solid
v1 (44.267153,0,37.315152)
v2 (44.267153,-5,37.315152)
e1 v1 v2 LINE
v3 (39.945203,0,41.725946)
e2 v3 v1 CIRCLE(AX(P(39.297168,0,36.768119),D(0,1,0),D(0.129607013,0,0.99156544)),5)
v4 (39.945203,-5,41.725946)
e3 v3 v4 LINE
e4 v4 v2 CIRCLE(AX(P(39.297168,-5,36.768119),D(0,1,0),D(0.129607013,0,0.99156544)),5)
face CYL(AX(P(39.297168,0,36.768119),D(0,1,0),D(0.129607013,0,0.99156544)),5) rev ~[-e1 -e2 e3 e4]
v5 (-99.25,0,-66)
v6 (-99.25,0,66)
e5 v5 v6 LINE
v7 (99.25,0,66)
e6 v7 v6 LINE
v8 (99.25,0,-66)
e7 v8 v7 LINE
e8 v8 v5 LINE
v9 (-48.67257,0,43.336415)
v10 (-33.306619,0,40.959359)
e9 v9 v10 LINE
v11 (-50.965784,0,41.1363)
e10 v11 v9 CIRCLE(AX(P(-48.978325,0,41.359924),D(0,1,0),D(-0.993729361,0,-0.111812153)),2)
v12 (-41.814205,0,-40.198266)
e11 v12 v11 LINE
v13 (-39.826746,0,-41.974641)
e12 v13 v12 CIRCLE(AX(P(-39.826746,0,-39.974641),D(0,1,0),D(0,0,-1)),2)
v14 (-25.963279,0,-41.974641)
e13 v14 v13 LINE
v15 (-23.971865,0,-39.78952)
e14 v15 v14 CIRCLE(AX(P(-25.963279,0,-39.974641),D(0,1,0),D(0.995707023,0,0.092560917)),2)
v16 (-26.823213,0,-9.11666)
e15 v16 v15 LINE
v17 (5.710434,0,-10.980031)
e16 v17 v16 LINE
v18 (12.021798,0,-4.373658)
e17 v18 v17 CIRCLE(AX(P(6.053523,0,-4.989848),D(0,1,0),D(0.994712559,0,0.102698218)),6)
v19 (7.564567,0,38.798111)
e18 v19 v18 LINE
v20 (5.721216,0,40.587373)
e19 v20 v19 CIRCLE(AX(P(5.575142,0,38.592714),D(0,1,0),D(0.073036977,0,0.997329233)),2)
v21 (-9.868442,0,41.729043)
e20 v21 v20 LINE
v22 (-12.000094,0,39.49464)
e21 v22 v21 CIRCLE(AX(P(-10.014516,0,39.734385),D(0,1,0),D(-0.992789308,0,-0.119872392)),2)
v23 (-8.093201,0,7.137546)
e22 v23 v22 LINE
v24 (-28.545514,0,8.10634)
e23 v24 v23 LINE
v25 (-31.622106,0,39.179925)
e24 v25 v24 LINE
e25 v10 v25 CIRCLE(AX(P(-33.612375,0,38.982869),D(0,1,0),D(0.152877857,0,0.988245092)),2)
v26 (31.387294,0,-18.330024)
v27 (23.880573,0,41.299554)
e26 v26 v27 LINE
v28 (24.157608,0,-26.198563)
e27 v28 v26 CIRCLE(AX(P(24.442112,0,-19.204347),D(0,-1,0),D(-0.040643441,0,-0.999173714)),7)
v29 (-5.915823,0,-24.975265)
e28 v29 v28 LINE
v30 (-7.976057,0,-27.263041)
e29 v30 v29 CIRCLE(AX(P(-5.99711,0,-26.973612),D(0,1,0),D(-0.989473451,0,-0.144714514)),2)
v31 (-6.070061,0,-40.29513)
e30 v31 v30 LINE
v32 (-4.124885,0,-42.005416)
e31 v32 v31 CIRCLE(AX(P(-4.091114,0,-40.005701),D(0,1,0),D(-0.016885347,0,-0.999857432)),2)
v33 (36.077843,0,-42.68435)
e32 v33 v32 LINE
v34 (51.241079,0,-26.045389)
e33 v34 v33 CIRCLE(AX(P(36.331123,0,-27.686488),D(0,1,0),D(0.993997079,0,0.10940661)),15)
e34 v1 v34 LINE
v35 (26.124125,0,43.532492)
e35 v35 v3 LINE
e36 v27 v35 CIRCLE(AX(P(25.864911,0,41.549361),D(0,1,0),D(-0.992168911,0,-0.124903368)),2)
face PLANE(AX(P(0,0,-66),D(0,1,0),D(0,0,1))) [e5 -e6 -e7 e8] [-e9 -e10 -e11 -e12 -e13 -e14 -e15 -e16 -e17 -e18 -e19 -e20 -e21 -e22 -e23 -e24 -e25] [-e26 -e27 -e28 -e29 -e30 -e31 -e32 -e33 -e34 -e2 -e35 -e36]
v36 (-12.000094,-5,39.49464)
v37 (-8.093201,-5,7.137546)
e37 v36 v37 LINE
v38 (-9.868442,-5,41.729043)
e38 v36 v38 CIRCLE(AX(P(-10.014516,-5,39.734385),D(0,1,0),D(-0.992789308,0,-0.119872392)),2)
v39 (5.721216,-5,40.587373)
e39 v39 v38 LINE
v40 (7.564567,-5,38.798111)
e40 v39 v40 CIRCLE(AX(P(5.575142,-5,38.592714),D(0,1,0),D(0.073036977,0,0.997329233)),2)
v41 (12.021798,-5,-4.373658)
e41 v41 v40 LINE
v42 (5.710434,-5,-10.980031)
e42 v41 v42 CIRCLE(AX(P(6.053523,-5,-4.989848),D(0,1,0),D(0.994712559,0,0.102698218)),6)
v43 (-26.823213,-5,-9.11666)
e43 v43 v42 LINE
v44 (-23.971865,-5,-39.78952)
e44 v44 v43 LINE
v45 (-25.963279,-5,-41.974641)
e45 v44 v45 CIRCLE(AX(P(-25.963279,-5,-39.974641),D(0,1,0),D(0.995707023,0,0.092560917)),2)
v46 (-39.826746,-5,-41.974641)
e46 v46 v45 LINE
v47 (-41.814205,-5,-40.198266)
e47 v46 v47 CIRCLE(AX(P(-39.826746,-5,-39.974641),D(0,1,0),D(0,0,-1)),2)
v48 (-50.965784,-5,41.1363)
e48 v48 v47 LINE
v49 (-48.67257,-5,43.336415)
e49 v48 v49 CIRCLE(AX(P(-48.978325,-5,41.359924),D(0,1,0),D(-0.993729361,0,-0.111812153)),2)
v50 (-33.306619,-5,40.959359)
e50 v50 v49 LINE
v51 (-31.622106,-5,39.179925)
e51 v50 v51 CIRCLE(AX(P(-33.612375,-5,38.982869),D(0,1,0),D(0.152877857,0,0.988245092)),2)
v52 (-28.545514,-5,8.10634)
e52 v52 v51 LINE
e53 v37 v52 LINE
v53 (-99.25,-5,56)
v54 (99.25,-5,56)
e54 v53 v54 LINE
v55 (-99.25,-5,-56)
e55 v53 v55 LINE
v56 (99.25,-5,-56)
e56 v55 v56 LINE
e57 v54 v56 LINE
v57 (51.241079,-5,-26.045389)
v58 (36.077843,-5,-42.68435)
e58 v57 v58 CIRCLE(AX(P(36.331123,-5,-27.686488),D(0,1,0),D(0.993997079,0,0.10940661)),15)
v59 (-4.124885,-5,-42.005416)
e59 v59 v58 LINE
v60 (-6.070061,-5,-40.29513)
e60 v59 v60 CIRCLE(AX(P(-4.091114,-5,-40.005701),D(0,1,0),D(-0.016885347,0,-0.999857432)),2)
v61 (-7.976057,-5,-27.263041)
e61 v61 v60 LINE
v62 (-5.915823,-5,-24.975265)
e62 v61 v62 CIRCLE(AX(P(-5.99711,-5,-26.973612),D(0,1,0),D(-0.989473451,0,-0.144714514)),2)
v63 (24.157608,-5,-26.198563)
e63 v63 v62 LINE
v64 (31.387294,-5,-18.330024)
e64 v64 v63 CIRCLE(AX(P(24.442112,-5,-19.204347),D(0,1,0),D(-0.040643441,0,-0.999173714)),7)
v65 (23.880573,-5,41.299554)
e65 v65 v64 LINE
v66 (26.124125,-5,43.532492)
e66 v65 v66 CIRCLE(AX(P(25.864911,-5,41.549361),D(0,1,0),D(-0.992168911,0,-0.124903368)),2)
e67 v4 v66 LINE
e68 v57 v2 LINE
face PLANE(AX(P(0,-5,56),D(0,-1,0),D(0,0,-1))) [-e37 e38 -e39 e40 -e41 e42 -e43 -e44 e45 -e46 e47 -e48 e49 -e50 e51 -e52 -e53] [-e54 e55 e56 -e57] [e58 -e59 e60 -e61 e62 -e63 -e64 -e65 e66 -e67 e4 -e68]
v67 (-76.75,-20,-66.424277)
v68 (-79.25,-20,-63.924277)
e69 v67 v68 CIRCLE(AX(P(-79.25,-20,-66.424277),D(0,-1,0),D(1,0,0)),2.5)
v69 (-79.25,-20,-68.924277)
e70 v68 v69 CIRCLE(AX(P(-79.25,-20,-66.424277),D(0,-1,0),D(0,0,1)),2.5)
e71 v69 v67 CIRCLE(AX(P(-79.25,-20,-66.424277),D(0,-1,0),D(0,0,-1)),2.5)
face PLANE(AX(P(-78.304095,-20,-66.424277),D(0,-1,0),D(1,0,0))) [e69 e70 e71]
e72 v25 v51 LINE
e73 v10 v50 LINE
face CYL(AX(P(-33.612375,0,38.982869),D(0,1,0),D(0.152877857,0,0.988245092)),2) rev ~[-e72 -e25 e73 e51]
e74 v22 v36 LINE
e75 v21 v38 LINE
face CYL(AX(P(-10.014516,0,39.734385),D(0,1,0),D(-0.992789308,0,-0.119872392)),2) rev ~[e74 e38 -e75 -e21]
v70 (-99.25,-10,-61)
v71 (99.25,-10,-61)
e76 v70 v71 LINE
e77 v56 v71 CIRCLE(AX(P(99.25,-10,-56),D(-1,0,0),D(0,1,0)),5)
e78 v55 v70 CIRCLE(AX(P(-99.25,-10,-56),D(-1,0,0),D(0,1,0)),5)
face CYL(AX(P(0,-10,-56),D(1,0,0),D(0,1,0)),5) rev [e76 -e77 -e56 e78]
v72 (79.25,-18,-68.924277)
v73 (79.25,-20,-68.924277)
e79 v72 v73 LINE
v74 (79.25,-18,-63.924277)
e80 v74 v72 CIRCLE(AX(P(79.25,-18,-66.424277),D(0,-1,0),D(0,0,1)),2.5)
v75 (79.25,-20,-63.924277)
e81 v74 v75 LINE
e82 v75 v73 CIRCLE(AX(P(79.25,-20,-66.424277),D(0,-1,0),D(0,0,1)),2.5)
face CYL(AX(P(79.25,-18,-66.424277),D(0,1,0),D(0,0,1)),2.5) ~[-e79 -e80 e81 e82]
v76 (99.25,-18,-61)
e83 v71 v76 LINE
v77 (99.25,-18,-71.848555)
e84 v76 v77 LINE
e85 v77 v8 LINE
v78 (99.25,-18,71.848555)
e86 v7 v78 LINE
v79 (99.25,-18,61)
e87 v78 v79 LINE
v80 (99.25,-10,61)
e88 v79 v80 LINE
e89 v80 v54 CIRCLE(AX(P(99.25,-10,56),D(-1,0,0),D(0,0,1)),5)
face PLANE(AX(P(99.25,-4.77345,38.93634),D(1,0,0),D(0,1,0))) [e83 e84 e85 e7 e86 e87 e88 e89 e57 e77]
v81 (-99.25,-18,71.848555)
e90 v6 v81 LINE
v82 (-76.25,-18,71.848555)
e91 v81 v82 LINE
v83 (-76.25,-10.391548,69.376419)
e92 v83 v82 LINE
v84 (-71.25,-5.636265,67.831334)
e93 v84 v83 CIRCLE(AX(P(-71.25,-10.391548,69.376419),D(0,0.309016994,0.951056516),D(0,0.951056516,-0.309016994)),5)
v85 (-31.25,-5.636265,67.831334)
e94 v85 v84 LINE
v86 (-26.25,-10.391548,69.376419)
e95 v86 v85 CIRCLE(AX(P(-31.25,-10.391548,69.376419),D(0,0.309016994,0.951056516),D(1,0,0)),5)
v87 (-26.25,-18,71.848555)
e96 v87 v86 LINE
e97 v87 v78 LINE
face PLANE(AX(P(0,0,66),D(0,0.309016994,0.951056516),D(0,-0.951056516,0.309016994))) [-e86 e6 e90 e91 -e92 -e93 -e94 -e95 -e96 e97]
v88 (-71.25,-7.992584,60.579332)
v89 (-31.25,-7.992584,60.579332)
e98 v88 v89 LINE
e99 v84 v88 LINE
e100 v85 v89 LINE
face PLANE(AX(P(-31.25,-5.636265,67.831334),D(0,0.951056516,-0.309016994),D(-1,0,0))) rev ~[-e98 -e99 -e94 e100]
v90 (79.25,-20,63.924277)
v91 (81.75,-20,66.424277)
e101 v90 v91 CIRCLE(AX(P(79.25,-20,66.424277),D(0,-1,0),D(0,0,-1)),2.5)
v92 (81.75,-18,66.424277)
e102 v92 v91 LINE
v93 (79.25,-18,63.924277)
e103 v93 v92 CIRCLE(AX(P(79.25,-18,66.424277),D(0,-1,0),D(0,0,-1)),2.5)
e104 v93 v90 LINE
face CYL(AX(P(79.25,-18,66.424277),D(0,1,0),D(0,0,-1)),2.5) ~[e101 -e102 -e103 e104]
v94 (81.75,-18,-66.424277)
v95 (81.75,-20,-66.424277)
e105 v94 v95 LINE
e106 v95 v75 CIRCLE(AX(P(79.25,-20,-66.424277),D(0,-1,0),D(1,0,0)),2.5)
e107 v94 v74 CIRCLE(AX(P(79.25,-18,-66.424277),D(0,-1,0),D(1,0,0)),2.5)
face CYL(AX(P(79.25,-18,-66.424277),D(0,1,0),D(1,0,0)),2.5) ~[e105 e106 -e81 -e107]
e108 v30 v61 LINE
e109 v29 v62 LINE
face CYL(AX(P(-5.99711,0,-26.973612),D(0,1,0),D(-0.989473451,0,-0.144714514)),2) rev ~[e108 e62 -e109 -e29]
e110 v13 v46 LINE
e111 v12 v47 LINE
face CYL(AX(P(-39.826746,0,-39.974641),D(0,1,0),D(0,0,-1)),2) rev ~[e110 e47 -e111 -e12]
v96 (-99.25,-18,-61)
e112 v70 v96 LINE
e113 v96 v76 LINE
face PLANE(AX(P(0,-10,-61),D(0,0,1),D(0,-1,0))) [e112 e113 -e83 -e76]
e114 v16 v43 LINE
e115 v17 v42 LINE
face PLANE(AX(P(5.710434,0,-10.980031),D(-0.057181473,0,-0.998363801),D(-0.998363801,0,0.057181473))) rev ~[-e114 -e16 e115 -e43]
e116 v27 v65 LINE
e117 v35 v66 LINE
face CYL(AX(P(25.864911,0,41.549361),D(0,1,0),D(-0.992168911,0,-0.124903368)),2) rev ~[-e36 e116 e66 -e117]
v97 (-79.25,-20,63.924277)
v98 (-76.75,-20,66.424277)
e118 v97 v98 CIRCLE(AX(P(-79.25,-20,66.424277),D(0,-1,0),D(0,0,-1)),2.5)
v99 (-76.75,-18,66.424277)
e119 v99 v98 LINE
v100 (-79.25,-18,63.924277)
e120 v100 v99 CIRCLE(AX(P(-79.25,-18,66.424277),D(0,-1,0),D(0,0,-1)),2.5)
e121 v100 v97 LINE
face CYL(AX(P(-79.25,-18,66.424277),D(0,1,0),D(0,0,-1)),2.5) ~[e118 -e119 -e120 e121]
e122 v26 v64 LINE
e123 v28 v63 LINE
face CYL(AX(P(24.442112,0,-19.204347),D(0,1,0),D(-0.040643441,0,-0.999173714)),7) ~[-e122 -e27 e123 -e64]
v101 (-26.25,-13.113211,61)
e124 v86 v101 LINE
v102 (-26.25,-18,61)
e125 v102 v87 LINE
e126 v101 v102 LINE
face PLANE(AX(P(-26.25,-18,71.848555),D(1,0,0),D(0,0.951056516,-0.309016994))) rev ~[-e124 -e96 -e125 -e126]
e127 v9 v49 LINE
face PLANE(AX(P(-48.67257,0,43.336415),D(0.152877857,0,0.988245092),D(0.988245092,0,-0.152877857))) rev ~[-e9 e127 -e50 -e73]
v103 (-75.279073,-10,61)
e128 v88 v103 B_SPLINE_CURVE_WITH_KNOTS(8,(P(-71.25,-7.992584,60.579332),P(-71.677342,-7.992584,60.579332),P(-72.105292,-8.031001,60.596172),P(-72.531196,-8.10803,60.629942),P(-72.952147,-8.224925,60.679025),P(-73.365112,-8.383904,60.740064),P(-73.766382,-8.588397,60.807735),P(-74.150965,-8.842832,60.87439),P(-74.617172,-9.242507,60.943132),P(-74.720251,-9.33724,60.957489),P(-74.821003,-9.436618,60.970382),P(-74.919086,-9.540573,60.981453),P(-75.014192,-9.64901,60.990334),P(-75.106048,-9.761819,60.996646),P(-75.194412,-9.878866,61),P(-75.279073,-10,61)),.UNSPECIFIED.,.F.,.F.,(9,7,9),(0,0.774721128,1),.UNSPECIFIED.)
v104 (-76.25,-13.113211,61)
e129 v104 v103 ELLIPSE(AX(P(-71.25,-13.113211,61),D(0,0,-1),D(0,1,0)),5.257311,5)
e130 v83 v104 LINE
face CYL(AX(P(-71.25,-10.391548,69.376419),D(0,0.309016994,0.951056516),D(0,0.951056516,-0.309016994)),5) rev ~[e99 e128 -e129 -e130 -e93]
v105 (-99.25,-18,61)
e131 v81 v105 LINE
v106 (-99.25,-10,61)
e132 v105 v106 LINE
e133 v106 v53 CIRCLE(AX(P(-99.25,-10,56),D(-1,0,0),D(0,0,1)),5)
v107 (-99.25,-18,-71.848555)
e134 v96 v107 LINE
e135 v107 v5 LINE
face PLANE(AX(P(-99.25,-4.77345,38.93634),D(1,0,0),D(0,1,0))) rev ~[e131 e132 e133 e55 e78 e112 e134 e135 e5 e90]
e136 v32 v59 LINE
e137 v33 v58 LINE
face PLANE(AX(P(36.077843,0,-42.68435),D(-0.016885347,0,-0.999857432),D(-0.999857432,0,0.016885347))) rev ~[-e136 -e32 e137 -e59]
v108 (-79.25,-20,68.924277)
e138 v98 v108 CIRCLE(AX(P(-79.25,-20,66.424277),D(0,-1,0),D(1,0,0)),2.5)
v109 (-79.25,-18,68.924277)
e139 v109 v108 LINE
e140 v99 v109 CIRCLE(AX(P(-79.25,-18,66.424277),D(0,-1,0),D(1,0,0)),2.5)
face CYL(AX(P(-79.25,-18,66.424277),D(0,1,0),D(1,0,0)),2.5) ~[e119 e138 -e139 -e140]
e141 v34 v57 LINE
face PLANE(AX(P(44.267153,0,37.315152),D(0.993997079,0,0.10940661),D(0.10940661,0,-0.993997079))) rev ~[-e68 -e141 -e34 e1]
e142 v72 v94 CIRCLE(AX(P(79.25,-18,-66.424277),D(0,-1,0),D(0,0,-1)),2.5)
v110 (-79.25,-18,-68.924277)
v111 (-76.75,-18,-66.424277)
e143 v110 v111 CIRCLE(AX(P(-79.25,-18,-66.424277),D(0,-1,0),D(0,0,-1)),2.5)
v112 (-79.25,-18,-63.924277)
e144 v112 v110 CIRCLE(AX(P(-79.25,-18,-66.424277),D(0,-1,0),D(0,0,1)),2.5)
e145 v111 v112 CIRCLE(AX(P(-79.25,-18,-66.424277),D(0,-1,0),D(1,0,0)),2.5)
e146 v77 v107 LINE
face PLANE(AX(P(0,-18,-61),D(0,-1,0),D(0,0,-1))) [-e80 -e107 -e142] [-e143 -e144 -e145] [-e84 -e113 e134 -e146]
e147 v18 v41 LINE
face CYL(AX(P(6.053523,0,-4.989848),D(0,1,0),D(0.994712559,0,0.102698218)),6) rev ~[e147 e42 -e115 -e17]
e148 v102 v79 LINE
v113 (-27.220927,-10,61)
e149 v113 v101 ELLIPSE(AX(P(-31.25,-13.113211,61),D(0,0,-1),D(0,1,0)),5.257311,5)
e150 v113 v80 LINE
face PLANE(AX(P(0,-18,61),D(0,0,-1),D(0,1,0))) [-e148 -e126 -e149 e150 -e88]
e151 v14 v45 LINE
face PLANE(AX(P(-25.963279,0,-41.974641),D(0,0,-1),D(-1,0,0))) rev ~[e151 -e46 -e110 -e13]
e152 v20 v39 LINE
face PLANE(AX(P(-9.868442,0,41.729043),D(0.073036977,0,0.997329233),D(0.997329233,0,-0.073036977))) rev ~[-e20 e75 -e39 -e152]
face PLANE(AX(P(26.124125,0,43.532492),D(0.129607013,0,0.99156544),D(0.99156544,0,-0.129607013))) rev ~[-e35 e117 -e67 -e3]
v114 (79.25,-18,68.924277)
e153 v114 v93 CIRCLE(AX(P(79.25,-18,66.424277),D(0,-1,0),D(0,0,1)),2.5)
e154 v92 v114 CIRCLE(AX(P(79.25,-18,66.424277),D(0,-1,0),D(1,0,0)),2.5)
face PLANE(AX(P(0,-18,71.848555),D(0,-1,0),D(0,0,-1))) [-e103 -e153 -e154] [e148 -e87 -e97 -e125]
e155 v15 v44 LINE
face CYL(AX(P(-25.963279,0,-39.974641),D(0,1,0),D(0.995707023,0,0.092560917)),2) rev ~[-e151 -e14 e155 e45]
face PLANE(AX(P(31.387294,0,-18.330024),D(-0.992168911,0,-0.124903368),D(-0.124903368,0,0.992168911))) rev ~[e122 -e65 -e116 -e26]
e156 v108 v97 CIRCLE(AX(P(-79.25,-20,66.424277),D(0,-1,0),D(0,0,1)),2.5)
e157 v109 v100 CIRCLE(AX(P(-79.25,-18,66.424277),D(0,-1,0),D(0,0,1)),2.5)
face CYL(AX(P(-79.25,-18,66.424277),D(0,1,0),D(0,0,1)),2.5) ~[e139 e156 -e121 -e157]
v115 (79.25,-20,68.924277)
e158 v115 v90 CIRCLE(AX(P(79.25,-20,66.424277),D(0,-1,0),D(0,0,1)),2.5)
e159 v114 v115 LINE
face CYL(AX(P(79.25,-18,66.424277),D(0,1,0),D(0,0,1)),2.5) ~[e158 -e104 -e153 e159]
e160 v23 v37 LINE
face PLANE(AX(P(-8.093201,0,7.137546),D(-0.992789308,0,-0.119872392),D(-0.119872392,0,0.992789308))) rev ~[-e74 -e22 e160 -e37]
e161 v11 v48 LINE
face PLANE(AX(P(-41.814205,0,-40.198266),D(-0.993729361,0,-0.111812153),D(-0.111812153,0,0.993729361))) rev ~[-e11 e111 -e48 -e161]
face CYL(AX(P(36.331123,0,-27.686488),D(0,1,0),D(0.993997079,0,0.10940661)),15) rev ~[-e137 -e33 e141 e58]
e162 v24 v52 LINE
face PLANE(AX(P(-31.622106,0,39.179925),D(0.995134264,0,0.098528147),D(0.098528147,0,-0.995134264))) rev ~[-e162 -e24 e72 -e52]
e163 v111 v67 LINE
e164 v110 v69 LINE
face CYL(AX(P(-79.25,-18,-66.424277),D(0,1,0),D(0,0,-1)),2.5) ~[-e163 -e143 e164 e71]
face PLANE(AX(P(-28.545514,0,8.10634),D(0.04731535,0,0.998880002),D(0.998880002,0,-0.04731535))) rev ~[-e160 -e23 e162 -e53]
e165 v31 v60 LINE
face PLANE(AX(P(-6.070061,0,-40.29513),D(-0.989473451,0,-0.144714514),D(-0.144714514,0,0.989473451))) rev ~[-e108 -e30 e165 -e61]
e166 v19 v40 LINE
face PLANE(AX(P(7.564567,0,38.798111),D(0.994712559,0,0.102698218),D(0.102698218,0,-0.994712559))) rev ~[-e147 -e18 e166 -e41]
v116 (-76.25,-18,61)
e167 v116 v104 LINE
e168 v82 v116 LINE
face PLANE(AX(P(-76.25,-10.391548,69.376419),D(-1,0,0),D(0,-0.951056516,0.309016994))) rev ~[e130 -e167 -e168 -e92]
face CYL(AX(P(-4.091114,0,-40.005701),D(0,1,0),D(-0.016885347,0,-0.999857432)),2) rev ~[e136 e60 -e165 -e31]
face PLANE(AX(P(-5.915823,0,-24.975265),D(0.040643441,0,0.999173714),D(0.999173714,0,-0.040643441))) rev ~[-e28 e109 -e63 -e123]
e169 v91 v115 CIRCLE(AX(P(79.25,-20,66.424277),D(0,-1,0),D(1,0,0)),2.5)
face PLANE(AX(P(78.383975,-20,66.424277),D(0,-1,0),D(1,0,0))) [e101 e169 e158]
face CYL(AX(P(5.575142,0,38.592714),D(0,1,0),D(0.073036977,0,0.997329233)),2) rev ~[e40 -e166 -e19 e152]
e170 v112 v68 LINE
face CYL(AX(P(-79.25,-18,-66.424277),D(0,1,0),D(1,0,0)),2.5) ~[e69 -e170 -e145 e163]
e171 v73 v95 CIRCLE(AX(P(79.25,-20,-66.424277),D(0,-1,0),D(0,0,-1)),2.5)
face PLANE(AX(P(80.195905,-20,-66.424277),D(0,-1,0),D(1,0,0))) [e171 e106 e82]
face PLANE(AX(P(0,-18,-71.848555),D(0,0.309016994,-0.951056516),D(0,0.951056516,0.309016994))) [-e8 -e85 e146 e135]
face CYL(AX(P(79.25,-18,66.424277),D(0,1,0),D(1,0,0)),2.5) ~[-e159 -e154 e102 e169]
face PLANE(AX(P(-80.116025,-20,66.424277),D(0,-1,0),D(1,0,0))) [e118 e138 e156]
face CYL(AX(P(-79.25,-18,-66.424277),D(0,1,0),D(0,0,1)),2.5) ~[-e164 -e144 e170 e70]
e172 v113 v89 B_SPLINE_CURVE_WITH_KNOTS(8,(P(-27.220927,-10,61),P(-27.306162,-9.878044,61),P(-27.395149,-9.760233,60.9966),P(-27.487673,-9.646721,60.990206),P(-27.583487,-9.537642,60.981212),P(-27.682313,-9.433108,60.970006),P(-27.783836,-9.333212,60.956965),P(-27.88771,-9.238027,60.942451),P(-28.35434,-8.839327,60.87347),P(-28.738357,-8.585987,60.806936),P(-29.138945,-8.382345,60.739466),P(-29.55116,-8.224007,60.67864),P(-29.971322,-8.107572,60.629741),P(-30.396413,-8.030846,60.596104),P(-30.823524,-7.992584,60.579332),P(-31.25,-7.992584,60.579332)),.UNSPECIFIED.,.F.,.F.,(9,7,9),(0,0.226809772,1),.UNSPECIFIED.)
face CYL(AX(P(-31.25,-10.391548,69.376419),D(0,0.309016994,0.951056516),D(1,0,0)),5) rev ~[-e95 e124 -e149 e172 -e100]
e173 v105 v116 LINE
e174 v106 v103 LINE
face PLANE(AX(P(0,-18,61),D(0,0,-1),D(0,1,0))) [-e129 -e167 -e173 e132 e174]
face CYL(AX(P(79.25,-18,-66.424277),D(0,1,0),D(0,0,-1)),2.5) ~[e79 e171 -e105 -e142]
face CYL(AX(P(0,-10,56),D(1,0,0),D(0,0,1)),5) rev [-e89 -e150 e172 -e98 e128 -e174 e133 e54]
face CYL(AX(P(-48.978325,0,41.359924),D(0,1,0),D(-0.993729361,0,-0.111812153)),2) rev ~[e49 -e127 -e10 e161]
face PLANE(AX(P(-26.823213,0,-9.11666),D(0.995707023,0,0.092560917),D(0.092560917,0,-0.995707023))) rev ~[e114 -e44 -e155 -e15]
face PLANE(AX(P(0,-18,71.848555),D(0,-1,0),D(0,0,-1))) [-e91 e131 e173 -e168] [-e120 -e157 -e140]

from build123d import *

# Parameters (mm, degrees)
F1_DEPTH = 99.25
F4_DEPTH = 2
F6_DEPTH = 12
F8_DEPTH = 10


# Not quite as in the source:
# - a feature names something its author has since deleted; it is built from what else it names


with BuildPart() as f1:
    # F0 (on Right) → F1 (new body, symmetric)
    with BuildSketch(Plane.YZ):
        with BuildLine():
            Line((0, 0), (0, 66))
            Line((0, 66), (-18, 71.8485545322))
            Line((-18, 71.8485545322), (-18, 61))
            Line((-18, 61), (-10, 61))
            ThreePointArc((-10, 61), (-6.4644660941, 59.5355339059), (-5, 56))
            Line((-5, 56), (-5, 0))
            Line((-5, 0), (0, 0))
        make_face()
        with BuildLine():
            Line((0, -66), (0, 0))
            Line((0, 0), (-5, 0))
            Line((-5, 0), (-5, -56))
            ThreePointArc((-5, -56), (-6.4644660941, -59.5355339059), (-10, -61))
            Line((-10, -61), (-18, -61))
            Line((-18, -61), (-18, -71.8485545322))
            Line((-18, -71.8485545322), (0, -66))
        make_face()
    extrude(amount=F1_DEPTH, both=True)

    # F3 (on face) + F2 (on face) → F4 (join)
    with BuildSketch(Plane.XZ.offset(18)):
        with BuildLine():
            ThreePointArc((-76.75, -66.4242772661), (-77.482233047, -64.6565103131), (-79.25, -63.9242772661))
            Line((-79.25, -63.9242772661), (-79.25, -68.9242772661))
            ThreePointArc((-79.25, -68.9242772661), (-77.482233047, -68.1920442191), (-76.75, -66.4242772661))
        make_face()
        with BuildLine():
            Line((-79.25, -68.9242772661), (-79.25, -63.9242772661))
            ThreePointArc((-79.25, -63.9242772661), (-81.75, -66.4242772661), (-79.25, -68.9242772661))
        make_face()
        with BuildLine():
            ThreePointArc((81.75, -66.4242772661), (81.017766953, -64.6565103131), (79.25, -63.9242772661))
            Line((79.25, -63.9242772661), (79.25, -68.9242772661))
            ThreePointArc((79.25, -68.9242772661), (81.017766953, -68.1920442191), (81.75, -66.4242772661))
        make_face()
        with BuildLine():
            Line((79.25, -68.9242772661), (79.25, -63.9242772661))
            ThreePointArc((79.25, -63.9242772661), (76.75, -66.4242772661), (79.25, -68.9242772661))
        make_face()
    with BuildSketch(Plane.XZ.offset(18)):
        with BuildLine():
            Line((-79.25, 63.9242772661), (-79.25, 68.9242772661))
            ThreePointArc((-79.25, 68.9242772661), (-81.75, 66.4242772661), (-79.25, 63.9242772661))
        make_face()
        with BuildLine():
            ThreePointArc((-76.75, 66.4242772661), (-77.482233047, 68.1920442191), (-79.25, 68.9242772661))
            Line((-79.25, 68.9242772661), (-79.25, 63.9242772661))
            ThreePointArc((-79.25, 63.9242772661), (-77.482233047, 64.6565103131), (-76.75, 66.4242772661))
        make_face()
        with BuildLine():
            Line((79.25, 63.9242772661), (79.25, 68.9242772661))
            ThreePointArc((79.25, 68.9242772661), (76.75, 66.4242772661), (79.25, 63.9242772661))
        make_face()
        with BuildLine():
            ThreePointArc((81.75, 66.4242772661), (81.017766953, 68.1920442191), (79.25, 68.9242772661))
            Line((79.25, 68.9242772661), (79.25, 63.9242772661))
            ThreePointArc((79.25, 63.9242772661), (81.017766953, 64.6565103131), (81.75, 66.4242772661))
        make_face()
    extrude(amount=F4_DEPTH)

    # F5 (on face) → F6 (cut)
    with BuildSketch(Plane(origin=(0, 19.3969133257, 59.6975608144), x_dir=(1, 0, 0), z_dir=(0, 0.3090169944, 0.9510565163))):
        with BuildLine():
            Line((-31.25, -26.321441665), (-71.25, -26.321441665))
            ThreePointArc((-71.25, -26.321441665), (-74.7855339059, -27.7859077591), (-76.25, -31.321441665))
            Line((-76.25, -31.321441665), (-76.25, -39.321441665))
            Line((-76.25, -39.321441665), (-26.25, -39.321441665))
            Line((-26.25, -39.321441665), (-26.25, -31.321441665))
            ThreePointArc((-26.25, -31.321441665), (-27.7144660941, -27.7859077591), (-31.25, -26.321441665))
        make_face()
    extrude(amount=-F6_DEPTH, mode=Mode.SUBTRACT)

    # F7 (on face) → F8 (cut)
    with BuildSketch(Plane(origin=(0, 0, 0), x_dir=(-1, 0, 0), z_dir=(0, 1, 0))):
        with BuildLine():
            Line((-26.1241253117, 43.5324917753), (-39.945202857, 41.7259457748))
            ThreePointArc((-39.945202857, 41.7259457748), (-42.868486138, 40.2675021288), (-44.2671531873, 37.3151516253))
            Line((-44.2671531873, 37.3151516253), (-51.2410791047, -26.0453891719))
            ThreePointArc((-51.2410791047, -26.0453891719), (-47.4179750613, -37.7900376772), (-36.0778427088, -42.6843498113))
            Line((-36.0778427088, -42.6843498113), (4.1248849593, -42.0054160058))
            ThreePointArc((4.1248849593, -42.0054160058), (5.4117305762, -41.5076906746), (6.0700611664, -40.2951301685))
            Line((6.0700611664, -40.2951301685), (7.9760571648, -27.2630410602))
            ThreePointArc((7.9760571648, -27.2630410602), (7.4832995732, -25.6352393882), (5.915823381, -24.9752646049))
            Line((5.915823381, -24.9752646049), (-24.1576078612, -26.198563135))
            ThreePointArc((-24.1576078612, -26.198563135), (-29.5966863815, -23.9404174945), (-31.3872943296, -18.3300235635))
            Line((-31.3872943296, -18.3300235635), (-23.8805734625, 41.2995541596))
            ThreePointArc((-23.8805734625, 41.2995541596), (-24.45405494, 42.9669237235), (-26.1241253117, 43.5324917753))
        make_face()
        with BuildLine():
            ThreePointArc((-5.7212161103, 40.5873727881), (-6.9681438523, 40.0278262586), (-7.5645672745, 38.7981107574))
            Line((-7.5645672745, 38.7981107574), (-12.0217983934, -4.3736584849))
            ThreePointArc((-12.0217983934, -4.3736584849), (-10.3919235454, -9.1345167822), (-5.7104341995, -10.9800305997))
            Line((-5.7104341995, -10.9800305997), (26.823213324, -9.1166598722))
            Line((26.823213324, -9.1166598722), (23.9718645269, -39.7895195484))
            ThreePointArc((23.9718645269, -39.7895195484), (24.4850628135, -41.3218155235), (25.9632785739, -41.9746413827))
            Line((25.9632785739, -41.9746413827), (39.8267463101, -41.9746413827))
            ThreePointArc((39.8267463101, -41.9746413827), (41.1595537584, -41.4658235666), (41.8142050316, -40.1982656883))
            Line((41.8142050316, -40.1982656883), (50.9657841779, 41.1363000735))
            ThreePointArc((50.9657841779, 41.1363000735), (50.3629399127, 42.8031301188), (48.6725697432, 43.3364145622))
            Line((48.6725697432, 43.3364145622), (33.3066192392, 40.9593589134))
            ThreePointArc((33.3066192392, 40.9593589134), (32.1599535015, 40.357813067), (31.6221064236, 39.1799250248))
            Line((31.6221064236, 39.1799250248), (28.5455137491, 8.1063397229))
            Line((28.5455137491, 8.1063397229), (8.093200624, 7.1375463158))
            Line((8.093200624, 7.1375463158), (12.000094254, 39.4946401574))
            ThreePointArc((12.000094254, 39.4946401574), (11.4616105973, 41.1149341717), (9.8684416836, 41.7290434075))
            Line((9.8684416836, 41.7290434075), (-5.7212161103, 40.5873727881))
        make_face()
    extrude(amount=-F8_DEPTH, mode=Mode.SUBTRACT)


solid = f1.part
